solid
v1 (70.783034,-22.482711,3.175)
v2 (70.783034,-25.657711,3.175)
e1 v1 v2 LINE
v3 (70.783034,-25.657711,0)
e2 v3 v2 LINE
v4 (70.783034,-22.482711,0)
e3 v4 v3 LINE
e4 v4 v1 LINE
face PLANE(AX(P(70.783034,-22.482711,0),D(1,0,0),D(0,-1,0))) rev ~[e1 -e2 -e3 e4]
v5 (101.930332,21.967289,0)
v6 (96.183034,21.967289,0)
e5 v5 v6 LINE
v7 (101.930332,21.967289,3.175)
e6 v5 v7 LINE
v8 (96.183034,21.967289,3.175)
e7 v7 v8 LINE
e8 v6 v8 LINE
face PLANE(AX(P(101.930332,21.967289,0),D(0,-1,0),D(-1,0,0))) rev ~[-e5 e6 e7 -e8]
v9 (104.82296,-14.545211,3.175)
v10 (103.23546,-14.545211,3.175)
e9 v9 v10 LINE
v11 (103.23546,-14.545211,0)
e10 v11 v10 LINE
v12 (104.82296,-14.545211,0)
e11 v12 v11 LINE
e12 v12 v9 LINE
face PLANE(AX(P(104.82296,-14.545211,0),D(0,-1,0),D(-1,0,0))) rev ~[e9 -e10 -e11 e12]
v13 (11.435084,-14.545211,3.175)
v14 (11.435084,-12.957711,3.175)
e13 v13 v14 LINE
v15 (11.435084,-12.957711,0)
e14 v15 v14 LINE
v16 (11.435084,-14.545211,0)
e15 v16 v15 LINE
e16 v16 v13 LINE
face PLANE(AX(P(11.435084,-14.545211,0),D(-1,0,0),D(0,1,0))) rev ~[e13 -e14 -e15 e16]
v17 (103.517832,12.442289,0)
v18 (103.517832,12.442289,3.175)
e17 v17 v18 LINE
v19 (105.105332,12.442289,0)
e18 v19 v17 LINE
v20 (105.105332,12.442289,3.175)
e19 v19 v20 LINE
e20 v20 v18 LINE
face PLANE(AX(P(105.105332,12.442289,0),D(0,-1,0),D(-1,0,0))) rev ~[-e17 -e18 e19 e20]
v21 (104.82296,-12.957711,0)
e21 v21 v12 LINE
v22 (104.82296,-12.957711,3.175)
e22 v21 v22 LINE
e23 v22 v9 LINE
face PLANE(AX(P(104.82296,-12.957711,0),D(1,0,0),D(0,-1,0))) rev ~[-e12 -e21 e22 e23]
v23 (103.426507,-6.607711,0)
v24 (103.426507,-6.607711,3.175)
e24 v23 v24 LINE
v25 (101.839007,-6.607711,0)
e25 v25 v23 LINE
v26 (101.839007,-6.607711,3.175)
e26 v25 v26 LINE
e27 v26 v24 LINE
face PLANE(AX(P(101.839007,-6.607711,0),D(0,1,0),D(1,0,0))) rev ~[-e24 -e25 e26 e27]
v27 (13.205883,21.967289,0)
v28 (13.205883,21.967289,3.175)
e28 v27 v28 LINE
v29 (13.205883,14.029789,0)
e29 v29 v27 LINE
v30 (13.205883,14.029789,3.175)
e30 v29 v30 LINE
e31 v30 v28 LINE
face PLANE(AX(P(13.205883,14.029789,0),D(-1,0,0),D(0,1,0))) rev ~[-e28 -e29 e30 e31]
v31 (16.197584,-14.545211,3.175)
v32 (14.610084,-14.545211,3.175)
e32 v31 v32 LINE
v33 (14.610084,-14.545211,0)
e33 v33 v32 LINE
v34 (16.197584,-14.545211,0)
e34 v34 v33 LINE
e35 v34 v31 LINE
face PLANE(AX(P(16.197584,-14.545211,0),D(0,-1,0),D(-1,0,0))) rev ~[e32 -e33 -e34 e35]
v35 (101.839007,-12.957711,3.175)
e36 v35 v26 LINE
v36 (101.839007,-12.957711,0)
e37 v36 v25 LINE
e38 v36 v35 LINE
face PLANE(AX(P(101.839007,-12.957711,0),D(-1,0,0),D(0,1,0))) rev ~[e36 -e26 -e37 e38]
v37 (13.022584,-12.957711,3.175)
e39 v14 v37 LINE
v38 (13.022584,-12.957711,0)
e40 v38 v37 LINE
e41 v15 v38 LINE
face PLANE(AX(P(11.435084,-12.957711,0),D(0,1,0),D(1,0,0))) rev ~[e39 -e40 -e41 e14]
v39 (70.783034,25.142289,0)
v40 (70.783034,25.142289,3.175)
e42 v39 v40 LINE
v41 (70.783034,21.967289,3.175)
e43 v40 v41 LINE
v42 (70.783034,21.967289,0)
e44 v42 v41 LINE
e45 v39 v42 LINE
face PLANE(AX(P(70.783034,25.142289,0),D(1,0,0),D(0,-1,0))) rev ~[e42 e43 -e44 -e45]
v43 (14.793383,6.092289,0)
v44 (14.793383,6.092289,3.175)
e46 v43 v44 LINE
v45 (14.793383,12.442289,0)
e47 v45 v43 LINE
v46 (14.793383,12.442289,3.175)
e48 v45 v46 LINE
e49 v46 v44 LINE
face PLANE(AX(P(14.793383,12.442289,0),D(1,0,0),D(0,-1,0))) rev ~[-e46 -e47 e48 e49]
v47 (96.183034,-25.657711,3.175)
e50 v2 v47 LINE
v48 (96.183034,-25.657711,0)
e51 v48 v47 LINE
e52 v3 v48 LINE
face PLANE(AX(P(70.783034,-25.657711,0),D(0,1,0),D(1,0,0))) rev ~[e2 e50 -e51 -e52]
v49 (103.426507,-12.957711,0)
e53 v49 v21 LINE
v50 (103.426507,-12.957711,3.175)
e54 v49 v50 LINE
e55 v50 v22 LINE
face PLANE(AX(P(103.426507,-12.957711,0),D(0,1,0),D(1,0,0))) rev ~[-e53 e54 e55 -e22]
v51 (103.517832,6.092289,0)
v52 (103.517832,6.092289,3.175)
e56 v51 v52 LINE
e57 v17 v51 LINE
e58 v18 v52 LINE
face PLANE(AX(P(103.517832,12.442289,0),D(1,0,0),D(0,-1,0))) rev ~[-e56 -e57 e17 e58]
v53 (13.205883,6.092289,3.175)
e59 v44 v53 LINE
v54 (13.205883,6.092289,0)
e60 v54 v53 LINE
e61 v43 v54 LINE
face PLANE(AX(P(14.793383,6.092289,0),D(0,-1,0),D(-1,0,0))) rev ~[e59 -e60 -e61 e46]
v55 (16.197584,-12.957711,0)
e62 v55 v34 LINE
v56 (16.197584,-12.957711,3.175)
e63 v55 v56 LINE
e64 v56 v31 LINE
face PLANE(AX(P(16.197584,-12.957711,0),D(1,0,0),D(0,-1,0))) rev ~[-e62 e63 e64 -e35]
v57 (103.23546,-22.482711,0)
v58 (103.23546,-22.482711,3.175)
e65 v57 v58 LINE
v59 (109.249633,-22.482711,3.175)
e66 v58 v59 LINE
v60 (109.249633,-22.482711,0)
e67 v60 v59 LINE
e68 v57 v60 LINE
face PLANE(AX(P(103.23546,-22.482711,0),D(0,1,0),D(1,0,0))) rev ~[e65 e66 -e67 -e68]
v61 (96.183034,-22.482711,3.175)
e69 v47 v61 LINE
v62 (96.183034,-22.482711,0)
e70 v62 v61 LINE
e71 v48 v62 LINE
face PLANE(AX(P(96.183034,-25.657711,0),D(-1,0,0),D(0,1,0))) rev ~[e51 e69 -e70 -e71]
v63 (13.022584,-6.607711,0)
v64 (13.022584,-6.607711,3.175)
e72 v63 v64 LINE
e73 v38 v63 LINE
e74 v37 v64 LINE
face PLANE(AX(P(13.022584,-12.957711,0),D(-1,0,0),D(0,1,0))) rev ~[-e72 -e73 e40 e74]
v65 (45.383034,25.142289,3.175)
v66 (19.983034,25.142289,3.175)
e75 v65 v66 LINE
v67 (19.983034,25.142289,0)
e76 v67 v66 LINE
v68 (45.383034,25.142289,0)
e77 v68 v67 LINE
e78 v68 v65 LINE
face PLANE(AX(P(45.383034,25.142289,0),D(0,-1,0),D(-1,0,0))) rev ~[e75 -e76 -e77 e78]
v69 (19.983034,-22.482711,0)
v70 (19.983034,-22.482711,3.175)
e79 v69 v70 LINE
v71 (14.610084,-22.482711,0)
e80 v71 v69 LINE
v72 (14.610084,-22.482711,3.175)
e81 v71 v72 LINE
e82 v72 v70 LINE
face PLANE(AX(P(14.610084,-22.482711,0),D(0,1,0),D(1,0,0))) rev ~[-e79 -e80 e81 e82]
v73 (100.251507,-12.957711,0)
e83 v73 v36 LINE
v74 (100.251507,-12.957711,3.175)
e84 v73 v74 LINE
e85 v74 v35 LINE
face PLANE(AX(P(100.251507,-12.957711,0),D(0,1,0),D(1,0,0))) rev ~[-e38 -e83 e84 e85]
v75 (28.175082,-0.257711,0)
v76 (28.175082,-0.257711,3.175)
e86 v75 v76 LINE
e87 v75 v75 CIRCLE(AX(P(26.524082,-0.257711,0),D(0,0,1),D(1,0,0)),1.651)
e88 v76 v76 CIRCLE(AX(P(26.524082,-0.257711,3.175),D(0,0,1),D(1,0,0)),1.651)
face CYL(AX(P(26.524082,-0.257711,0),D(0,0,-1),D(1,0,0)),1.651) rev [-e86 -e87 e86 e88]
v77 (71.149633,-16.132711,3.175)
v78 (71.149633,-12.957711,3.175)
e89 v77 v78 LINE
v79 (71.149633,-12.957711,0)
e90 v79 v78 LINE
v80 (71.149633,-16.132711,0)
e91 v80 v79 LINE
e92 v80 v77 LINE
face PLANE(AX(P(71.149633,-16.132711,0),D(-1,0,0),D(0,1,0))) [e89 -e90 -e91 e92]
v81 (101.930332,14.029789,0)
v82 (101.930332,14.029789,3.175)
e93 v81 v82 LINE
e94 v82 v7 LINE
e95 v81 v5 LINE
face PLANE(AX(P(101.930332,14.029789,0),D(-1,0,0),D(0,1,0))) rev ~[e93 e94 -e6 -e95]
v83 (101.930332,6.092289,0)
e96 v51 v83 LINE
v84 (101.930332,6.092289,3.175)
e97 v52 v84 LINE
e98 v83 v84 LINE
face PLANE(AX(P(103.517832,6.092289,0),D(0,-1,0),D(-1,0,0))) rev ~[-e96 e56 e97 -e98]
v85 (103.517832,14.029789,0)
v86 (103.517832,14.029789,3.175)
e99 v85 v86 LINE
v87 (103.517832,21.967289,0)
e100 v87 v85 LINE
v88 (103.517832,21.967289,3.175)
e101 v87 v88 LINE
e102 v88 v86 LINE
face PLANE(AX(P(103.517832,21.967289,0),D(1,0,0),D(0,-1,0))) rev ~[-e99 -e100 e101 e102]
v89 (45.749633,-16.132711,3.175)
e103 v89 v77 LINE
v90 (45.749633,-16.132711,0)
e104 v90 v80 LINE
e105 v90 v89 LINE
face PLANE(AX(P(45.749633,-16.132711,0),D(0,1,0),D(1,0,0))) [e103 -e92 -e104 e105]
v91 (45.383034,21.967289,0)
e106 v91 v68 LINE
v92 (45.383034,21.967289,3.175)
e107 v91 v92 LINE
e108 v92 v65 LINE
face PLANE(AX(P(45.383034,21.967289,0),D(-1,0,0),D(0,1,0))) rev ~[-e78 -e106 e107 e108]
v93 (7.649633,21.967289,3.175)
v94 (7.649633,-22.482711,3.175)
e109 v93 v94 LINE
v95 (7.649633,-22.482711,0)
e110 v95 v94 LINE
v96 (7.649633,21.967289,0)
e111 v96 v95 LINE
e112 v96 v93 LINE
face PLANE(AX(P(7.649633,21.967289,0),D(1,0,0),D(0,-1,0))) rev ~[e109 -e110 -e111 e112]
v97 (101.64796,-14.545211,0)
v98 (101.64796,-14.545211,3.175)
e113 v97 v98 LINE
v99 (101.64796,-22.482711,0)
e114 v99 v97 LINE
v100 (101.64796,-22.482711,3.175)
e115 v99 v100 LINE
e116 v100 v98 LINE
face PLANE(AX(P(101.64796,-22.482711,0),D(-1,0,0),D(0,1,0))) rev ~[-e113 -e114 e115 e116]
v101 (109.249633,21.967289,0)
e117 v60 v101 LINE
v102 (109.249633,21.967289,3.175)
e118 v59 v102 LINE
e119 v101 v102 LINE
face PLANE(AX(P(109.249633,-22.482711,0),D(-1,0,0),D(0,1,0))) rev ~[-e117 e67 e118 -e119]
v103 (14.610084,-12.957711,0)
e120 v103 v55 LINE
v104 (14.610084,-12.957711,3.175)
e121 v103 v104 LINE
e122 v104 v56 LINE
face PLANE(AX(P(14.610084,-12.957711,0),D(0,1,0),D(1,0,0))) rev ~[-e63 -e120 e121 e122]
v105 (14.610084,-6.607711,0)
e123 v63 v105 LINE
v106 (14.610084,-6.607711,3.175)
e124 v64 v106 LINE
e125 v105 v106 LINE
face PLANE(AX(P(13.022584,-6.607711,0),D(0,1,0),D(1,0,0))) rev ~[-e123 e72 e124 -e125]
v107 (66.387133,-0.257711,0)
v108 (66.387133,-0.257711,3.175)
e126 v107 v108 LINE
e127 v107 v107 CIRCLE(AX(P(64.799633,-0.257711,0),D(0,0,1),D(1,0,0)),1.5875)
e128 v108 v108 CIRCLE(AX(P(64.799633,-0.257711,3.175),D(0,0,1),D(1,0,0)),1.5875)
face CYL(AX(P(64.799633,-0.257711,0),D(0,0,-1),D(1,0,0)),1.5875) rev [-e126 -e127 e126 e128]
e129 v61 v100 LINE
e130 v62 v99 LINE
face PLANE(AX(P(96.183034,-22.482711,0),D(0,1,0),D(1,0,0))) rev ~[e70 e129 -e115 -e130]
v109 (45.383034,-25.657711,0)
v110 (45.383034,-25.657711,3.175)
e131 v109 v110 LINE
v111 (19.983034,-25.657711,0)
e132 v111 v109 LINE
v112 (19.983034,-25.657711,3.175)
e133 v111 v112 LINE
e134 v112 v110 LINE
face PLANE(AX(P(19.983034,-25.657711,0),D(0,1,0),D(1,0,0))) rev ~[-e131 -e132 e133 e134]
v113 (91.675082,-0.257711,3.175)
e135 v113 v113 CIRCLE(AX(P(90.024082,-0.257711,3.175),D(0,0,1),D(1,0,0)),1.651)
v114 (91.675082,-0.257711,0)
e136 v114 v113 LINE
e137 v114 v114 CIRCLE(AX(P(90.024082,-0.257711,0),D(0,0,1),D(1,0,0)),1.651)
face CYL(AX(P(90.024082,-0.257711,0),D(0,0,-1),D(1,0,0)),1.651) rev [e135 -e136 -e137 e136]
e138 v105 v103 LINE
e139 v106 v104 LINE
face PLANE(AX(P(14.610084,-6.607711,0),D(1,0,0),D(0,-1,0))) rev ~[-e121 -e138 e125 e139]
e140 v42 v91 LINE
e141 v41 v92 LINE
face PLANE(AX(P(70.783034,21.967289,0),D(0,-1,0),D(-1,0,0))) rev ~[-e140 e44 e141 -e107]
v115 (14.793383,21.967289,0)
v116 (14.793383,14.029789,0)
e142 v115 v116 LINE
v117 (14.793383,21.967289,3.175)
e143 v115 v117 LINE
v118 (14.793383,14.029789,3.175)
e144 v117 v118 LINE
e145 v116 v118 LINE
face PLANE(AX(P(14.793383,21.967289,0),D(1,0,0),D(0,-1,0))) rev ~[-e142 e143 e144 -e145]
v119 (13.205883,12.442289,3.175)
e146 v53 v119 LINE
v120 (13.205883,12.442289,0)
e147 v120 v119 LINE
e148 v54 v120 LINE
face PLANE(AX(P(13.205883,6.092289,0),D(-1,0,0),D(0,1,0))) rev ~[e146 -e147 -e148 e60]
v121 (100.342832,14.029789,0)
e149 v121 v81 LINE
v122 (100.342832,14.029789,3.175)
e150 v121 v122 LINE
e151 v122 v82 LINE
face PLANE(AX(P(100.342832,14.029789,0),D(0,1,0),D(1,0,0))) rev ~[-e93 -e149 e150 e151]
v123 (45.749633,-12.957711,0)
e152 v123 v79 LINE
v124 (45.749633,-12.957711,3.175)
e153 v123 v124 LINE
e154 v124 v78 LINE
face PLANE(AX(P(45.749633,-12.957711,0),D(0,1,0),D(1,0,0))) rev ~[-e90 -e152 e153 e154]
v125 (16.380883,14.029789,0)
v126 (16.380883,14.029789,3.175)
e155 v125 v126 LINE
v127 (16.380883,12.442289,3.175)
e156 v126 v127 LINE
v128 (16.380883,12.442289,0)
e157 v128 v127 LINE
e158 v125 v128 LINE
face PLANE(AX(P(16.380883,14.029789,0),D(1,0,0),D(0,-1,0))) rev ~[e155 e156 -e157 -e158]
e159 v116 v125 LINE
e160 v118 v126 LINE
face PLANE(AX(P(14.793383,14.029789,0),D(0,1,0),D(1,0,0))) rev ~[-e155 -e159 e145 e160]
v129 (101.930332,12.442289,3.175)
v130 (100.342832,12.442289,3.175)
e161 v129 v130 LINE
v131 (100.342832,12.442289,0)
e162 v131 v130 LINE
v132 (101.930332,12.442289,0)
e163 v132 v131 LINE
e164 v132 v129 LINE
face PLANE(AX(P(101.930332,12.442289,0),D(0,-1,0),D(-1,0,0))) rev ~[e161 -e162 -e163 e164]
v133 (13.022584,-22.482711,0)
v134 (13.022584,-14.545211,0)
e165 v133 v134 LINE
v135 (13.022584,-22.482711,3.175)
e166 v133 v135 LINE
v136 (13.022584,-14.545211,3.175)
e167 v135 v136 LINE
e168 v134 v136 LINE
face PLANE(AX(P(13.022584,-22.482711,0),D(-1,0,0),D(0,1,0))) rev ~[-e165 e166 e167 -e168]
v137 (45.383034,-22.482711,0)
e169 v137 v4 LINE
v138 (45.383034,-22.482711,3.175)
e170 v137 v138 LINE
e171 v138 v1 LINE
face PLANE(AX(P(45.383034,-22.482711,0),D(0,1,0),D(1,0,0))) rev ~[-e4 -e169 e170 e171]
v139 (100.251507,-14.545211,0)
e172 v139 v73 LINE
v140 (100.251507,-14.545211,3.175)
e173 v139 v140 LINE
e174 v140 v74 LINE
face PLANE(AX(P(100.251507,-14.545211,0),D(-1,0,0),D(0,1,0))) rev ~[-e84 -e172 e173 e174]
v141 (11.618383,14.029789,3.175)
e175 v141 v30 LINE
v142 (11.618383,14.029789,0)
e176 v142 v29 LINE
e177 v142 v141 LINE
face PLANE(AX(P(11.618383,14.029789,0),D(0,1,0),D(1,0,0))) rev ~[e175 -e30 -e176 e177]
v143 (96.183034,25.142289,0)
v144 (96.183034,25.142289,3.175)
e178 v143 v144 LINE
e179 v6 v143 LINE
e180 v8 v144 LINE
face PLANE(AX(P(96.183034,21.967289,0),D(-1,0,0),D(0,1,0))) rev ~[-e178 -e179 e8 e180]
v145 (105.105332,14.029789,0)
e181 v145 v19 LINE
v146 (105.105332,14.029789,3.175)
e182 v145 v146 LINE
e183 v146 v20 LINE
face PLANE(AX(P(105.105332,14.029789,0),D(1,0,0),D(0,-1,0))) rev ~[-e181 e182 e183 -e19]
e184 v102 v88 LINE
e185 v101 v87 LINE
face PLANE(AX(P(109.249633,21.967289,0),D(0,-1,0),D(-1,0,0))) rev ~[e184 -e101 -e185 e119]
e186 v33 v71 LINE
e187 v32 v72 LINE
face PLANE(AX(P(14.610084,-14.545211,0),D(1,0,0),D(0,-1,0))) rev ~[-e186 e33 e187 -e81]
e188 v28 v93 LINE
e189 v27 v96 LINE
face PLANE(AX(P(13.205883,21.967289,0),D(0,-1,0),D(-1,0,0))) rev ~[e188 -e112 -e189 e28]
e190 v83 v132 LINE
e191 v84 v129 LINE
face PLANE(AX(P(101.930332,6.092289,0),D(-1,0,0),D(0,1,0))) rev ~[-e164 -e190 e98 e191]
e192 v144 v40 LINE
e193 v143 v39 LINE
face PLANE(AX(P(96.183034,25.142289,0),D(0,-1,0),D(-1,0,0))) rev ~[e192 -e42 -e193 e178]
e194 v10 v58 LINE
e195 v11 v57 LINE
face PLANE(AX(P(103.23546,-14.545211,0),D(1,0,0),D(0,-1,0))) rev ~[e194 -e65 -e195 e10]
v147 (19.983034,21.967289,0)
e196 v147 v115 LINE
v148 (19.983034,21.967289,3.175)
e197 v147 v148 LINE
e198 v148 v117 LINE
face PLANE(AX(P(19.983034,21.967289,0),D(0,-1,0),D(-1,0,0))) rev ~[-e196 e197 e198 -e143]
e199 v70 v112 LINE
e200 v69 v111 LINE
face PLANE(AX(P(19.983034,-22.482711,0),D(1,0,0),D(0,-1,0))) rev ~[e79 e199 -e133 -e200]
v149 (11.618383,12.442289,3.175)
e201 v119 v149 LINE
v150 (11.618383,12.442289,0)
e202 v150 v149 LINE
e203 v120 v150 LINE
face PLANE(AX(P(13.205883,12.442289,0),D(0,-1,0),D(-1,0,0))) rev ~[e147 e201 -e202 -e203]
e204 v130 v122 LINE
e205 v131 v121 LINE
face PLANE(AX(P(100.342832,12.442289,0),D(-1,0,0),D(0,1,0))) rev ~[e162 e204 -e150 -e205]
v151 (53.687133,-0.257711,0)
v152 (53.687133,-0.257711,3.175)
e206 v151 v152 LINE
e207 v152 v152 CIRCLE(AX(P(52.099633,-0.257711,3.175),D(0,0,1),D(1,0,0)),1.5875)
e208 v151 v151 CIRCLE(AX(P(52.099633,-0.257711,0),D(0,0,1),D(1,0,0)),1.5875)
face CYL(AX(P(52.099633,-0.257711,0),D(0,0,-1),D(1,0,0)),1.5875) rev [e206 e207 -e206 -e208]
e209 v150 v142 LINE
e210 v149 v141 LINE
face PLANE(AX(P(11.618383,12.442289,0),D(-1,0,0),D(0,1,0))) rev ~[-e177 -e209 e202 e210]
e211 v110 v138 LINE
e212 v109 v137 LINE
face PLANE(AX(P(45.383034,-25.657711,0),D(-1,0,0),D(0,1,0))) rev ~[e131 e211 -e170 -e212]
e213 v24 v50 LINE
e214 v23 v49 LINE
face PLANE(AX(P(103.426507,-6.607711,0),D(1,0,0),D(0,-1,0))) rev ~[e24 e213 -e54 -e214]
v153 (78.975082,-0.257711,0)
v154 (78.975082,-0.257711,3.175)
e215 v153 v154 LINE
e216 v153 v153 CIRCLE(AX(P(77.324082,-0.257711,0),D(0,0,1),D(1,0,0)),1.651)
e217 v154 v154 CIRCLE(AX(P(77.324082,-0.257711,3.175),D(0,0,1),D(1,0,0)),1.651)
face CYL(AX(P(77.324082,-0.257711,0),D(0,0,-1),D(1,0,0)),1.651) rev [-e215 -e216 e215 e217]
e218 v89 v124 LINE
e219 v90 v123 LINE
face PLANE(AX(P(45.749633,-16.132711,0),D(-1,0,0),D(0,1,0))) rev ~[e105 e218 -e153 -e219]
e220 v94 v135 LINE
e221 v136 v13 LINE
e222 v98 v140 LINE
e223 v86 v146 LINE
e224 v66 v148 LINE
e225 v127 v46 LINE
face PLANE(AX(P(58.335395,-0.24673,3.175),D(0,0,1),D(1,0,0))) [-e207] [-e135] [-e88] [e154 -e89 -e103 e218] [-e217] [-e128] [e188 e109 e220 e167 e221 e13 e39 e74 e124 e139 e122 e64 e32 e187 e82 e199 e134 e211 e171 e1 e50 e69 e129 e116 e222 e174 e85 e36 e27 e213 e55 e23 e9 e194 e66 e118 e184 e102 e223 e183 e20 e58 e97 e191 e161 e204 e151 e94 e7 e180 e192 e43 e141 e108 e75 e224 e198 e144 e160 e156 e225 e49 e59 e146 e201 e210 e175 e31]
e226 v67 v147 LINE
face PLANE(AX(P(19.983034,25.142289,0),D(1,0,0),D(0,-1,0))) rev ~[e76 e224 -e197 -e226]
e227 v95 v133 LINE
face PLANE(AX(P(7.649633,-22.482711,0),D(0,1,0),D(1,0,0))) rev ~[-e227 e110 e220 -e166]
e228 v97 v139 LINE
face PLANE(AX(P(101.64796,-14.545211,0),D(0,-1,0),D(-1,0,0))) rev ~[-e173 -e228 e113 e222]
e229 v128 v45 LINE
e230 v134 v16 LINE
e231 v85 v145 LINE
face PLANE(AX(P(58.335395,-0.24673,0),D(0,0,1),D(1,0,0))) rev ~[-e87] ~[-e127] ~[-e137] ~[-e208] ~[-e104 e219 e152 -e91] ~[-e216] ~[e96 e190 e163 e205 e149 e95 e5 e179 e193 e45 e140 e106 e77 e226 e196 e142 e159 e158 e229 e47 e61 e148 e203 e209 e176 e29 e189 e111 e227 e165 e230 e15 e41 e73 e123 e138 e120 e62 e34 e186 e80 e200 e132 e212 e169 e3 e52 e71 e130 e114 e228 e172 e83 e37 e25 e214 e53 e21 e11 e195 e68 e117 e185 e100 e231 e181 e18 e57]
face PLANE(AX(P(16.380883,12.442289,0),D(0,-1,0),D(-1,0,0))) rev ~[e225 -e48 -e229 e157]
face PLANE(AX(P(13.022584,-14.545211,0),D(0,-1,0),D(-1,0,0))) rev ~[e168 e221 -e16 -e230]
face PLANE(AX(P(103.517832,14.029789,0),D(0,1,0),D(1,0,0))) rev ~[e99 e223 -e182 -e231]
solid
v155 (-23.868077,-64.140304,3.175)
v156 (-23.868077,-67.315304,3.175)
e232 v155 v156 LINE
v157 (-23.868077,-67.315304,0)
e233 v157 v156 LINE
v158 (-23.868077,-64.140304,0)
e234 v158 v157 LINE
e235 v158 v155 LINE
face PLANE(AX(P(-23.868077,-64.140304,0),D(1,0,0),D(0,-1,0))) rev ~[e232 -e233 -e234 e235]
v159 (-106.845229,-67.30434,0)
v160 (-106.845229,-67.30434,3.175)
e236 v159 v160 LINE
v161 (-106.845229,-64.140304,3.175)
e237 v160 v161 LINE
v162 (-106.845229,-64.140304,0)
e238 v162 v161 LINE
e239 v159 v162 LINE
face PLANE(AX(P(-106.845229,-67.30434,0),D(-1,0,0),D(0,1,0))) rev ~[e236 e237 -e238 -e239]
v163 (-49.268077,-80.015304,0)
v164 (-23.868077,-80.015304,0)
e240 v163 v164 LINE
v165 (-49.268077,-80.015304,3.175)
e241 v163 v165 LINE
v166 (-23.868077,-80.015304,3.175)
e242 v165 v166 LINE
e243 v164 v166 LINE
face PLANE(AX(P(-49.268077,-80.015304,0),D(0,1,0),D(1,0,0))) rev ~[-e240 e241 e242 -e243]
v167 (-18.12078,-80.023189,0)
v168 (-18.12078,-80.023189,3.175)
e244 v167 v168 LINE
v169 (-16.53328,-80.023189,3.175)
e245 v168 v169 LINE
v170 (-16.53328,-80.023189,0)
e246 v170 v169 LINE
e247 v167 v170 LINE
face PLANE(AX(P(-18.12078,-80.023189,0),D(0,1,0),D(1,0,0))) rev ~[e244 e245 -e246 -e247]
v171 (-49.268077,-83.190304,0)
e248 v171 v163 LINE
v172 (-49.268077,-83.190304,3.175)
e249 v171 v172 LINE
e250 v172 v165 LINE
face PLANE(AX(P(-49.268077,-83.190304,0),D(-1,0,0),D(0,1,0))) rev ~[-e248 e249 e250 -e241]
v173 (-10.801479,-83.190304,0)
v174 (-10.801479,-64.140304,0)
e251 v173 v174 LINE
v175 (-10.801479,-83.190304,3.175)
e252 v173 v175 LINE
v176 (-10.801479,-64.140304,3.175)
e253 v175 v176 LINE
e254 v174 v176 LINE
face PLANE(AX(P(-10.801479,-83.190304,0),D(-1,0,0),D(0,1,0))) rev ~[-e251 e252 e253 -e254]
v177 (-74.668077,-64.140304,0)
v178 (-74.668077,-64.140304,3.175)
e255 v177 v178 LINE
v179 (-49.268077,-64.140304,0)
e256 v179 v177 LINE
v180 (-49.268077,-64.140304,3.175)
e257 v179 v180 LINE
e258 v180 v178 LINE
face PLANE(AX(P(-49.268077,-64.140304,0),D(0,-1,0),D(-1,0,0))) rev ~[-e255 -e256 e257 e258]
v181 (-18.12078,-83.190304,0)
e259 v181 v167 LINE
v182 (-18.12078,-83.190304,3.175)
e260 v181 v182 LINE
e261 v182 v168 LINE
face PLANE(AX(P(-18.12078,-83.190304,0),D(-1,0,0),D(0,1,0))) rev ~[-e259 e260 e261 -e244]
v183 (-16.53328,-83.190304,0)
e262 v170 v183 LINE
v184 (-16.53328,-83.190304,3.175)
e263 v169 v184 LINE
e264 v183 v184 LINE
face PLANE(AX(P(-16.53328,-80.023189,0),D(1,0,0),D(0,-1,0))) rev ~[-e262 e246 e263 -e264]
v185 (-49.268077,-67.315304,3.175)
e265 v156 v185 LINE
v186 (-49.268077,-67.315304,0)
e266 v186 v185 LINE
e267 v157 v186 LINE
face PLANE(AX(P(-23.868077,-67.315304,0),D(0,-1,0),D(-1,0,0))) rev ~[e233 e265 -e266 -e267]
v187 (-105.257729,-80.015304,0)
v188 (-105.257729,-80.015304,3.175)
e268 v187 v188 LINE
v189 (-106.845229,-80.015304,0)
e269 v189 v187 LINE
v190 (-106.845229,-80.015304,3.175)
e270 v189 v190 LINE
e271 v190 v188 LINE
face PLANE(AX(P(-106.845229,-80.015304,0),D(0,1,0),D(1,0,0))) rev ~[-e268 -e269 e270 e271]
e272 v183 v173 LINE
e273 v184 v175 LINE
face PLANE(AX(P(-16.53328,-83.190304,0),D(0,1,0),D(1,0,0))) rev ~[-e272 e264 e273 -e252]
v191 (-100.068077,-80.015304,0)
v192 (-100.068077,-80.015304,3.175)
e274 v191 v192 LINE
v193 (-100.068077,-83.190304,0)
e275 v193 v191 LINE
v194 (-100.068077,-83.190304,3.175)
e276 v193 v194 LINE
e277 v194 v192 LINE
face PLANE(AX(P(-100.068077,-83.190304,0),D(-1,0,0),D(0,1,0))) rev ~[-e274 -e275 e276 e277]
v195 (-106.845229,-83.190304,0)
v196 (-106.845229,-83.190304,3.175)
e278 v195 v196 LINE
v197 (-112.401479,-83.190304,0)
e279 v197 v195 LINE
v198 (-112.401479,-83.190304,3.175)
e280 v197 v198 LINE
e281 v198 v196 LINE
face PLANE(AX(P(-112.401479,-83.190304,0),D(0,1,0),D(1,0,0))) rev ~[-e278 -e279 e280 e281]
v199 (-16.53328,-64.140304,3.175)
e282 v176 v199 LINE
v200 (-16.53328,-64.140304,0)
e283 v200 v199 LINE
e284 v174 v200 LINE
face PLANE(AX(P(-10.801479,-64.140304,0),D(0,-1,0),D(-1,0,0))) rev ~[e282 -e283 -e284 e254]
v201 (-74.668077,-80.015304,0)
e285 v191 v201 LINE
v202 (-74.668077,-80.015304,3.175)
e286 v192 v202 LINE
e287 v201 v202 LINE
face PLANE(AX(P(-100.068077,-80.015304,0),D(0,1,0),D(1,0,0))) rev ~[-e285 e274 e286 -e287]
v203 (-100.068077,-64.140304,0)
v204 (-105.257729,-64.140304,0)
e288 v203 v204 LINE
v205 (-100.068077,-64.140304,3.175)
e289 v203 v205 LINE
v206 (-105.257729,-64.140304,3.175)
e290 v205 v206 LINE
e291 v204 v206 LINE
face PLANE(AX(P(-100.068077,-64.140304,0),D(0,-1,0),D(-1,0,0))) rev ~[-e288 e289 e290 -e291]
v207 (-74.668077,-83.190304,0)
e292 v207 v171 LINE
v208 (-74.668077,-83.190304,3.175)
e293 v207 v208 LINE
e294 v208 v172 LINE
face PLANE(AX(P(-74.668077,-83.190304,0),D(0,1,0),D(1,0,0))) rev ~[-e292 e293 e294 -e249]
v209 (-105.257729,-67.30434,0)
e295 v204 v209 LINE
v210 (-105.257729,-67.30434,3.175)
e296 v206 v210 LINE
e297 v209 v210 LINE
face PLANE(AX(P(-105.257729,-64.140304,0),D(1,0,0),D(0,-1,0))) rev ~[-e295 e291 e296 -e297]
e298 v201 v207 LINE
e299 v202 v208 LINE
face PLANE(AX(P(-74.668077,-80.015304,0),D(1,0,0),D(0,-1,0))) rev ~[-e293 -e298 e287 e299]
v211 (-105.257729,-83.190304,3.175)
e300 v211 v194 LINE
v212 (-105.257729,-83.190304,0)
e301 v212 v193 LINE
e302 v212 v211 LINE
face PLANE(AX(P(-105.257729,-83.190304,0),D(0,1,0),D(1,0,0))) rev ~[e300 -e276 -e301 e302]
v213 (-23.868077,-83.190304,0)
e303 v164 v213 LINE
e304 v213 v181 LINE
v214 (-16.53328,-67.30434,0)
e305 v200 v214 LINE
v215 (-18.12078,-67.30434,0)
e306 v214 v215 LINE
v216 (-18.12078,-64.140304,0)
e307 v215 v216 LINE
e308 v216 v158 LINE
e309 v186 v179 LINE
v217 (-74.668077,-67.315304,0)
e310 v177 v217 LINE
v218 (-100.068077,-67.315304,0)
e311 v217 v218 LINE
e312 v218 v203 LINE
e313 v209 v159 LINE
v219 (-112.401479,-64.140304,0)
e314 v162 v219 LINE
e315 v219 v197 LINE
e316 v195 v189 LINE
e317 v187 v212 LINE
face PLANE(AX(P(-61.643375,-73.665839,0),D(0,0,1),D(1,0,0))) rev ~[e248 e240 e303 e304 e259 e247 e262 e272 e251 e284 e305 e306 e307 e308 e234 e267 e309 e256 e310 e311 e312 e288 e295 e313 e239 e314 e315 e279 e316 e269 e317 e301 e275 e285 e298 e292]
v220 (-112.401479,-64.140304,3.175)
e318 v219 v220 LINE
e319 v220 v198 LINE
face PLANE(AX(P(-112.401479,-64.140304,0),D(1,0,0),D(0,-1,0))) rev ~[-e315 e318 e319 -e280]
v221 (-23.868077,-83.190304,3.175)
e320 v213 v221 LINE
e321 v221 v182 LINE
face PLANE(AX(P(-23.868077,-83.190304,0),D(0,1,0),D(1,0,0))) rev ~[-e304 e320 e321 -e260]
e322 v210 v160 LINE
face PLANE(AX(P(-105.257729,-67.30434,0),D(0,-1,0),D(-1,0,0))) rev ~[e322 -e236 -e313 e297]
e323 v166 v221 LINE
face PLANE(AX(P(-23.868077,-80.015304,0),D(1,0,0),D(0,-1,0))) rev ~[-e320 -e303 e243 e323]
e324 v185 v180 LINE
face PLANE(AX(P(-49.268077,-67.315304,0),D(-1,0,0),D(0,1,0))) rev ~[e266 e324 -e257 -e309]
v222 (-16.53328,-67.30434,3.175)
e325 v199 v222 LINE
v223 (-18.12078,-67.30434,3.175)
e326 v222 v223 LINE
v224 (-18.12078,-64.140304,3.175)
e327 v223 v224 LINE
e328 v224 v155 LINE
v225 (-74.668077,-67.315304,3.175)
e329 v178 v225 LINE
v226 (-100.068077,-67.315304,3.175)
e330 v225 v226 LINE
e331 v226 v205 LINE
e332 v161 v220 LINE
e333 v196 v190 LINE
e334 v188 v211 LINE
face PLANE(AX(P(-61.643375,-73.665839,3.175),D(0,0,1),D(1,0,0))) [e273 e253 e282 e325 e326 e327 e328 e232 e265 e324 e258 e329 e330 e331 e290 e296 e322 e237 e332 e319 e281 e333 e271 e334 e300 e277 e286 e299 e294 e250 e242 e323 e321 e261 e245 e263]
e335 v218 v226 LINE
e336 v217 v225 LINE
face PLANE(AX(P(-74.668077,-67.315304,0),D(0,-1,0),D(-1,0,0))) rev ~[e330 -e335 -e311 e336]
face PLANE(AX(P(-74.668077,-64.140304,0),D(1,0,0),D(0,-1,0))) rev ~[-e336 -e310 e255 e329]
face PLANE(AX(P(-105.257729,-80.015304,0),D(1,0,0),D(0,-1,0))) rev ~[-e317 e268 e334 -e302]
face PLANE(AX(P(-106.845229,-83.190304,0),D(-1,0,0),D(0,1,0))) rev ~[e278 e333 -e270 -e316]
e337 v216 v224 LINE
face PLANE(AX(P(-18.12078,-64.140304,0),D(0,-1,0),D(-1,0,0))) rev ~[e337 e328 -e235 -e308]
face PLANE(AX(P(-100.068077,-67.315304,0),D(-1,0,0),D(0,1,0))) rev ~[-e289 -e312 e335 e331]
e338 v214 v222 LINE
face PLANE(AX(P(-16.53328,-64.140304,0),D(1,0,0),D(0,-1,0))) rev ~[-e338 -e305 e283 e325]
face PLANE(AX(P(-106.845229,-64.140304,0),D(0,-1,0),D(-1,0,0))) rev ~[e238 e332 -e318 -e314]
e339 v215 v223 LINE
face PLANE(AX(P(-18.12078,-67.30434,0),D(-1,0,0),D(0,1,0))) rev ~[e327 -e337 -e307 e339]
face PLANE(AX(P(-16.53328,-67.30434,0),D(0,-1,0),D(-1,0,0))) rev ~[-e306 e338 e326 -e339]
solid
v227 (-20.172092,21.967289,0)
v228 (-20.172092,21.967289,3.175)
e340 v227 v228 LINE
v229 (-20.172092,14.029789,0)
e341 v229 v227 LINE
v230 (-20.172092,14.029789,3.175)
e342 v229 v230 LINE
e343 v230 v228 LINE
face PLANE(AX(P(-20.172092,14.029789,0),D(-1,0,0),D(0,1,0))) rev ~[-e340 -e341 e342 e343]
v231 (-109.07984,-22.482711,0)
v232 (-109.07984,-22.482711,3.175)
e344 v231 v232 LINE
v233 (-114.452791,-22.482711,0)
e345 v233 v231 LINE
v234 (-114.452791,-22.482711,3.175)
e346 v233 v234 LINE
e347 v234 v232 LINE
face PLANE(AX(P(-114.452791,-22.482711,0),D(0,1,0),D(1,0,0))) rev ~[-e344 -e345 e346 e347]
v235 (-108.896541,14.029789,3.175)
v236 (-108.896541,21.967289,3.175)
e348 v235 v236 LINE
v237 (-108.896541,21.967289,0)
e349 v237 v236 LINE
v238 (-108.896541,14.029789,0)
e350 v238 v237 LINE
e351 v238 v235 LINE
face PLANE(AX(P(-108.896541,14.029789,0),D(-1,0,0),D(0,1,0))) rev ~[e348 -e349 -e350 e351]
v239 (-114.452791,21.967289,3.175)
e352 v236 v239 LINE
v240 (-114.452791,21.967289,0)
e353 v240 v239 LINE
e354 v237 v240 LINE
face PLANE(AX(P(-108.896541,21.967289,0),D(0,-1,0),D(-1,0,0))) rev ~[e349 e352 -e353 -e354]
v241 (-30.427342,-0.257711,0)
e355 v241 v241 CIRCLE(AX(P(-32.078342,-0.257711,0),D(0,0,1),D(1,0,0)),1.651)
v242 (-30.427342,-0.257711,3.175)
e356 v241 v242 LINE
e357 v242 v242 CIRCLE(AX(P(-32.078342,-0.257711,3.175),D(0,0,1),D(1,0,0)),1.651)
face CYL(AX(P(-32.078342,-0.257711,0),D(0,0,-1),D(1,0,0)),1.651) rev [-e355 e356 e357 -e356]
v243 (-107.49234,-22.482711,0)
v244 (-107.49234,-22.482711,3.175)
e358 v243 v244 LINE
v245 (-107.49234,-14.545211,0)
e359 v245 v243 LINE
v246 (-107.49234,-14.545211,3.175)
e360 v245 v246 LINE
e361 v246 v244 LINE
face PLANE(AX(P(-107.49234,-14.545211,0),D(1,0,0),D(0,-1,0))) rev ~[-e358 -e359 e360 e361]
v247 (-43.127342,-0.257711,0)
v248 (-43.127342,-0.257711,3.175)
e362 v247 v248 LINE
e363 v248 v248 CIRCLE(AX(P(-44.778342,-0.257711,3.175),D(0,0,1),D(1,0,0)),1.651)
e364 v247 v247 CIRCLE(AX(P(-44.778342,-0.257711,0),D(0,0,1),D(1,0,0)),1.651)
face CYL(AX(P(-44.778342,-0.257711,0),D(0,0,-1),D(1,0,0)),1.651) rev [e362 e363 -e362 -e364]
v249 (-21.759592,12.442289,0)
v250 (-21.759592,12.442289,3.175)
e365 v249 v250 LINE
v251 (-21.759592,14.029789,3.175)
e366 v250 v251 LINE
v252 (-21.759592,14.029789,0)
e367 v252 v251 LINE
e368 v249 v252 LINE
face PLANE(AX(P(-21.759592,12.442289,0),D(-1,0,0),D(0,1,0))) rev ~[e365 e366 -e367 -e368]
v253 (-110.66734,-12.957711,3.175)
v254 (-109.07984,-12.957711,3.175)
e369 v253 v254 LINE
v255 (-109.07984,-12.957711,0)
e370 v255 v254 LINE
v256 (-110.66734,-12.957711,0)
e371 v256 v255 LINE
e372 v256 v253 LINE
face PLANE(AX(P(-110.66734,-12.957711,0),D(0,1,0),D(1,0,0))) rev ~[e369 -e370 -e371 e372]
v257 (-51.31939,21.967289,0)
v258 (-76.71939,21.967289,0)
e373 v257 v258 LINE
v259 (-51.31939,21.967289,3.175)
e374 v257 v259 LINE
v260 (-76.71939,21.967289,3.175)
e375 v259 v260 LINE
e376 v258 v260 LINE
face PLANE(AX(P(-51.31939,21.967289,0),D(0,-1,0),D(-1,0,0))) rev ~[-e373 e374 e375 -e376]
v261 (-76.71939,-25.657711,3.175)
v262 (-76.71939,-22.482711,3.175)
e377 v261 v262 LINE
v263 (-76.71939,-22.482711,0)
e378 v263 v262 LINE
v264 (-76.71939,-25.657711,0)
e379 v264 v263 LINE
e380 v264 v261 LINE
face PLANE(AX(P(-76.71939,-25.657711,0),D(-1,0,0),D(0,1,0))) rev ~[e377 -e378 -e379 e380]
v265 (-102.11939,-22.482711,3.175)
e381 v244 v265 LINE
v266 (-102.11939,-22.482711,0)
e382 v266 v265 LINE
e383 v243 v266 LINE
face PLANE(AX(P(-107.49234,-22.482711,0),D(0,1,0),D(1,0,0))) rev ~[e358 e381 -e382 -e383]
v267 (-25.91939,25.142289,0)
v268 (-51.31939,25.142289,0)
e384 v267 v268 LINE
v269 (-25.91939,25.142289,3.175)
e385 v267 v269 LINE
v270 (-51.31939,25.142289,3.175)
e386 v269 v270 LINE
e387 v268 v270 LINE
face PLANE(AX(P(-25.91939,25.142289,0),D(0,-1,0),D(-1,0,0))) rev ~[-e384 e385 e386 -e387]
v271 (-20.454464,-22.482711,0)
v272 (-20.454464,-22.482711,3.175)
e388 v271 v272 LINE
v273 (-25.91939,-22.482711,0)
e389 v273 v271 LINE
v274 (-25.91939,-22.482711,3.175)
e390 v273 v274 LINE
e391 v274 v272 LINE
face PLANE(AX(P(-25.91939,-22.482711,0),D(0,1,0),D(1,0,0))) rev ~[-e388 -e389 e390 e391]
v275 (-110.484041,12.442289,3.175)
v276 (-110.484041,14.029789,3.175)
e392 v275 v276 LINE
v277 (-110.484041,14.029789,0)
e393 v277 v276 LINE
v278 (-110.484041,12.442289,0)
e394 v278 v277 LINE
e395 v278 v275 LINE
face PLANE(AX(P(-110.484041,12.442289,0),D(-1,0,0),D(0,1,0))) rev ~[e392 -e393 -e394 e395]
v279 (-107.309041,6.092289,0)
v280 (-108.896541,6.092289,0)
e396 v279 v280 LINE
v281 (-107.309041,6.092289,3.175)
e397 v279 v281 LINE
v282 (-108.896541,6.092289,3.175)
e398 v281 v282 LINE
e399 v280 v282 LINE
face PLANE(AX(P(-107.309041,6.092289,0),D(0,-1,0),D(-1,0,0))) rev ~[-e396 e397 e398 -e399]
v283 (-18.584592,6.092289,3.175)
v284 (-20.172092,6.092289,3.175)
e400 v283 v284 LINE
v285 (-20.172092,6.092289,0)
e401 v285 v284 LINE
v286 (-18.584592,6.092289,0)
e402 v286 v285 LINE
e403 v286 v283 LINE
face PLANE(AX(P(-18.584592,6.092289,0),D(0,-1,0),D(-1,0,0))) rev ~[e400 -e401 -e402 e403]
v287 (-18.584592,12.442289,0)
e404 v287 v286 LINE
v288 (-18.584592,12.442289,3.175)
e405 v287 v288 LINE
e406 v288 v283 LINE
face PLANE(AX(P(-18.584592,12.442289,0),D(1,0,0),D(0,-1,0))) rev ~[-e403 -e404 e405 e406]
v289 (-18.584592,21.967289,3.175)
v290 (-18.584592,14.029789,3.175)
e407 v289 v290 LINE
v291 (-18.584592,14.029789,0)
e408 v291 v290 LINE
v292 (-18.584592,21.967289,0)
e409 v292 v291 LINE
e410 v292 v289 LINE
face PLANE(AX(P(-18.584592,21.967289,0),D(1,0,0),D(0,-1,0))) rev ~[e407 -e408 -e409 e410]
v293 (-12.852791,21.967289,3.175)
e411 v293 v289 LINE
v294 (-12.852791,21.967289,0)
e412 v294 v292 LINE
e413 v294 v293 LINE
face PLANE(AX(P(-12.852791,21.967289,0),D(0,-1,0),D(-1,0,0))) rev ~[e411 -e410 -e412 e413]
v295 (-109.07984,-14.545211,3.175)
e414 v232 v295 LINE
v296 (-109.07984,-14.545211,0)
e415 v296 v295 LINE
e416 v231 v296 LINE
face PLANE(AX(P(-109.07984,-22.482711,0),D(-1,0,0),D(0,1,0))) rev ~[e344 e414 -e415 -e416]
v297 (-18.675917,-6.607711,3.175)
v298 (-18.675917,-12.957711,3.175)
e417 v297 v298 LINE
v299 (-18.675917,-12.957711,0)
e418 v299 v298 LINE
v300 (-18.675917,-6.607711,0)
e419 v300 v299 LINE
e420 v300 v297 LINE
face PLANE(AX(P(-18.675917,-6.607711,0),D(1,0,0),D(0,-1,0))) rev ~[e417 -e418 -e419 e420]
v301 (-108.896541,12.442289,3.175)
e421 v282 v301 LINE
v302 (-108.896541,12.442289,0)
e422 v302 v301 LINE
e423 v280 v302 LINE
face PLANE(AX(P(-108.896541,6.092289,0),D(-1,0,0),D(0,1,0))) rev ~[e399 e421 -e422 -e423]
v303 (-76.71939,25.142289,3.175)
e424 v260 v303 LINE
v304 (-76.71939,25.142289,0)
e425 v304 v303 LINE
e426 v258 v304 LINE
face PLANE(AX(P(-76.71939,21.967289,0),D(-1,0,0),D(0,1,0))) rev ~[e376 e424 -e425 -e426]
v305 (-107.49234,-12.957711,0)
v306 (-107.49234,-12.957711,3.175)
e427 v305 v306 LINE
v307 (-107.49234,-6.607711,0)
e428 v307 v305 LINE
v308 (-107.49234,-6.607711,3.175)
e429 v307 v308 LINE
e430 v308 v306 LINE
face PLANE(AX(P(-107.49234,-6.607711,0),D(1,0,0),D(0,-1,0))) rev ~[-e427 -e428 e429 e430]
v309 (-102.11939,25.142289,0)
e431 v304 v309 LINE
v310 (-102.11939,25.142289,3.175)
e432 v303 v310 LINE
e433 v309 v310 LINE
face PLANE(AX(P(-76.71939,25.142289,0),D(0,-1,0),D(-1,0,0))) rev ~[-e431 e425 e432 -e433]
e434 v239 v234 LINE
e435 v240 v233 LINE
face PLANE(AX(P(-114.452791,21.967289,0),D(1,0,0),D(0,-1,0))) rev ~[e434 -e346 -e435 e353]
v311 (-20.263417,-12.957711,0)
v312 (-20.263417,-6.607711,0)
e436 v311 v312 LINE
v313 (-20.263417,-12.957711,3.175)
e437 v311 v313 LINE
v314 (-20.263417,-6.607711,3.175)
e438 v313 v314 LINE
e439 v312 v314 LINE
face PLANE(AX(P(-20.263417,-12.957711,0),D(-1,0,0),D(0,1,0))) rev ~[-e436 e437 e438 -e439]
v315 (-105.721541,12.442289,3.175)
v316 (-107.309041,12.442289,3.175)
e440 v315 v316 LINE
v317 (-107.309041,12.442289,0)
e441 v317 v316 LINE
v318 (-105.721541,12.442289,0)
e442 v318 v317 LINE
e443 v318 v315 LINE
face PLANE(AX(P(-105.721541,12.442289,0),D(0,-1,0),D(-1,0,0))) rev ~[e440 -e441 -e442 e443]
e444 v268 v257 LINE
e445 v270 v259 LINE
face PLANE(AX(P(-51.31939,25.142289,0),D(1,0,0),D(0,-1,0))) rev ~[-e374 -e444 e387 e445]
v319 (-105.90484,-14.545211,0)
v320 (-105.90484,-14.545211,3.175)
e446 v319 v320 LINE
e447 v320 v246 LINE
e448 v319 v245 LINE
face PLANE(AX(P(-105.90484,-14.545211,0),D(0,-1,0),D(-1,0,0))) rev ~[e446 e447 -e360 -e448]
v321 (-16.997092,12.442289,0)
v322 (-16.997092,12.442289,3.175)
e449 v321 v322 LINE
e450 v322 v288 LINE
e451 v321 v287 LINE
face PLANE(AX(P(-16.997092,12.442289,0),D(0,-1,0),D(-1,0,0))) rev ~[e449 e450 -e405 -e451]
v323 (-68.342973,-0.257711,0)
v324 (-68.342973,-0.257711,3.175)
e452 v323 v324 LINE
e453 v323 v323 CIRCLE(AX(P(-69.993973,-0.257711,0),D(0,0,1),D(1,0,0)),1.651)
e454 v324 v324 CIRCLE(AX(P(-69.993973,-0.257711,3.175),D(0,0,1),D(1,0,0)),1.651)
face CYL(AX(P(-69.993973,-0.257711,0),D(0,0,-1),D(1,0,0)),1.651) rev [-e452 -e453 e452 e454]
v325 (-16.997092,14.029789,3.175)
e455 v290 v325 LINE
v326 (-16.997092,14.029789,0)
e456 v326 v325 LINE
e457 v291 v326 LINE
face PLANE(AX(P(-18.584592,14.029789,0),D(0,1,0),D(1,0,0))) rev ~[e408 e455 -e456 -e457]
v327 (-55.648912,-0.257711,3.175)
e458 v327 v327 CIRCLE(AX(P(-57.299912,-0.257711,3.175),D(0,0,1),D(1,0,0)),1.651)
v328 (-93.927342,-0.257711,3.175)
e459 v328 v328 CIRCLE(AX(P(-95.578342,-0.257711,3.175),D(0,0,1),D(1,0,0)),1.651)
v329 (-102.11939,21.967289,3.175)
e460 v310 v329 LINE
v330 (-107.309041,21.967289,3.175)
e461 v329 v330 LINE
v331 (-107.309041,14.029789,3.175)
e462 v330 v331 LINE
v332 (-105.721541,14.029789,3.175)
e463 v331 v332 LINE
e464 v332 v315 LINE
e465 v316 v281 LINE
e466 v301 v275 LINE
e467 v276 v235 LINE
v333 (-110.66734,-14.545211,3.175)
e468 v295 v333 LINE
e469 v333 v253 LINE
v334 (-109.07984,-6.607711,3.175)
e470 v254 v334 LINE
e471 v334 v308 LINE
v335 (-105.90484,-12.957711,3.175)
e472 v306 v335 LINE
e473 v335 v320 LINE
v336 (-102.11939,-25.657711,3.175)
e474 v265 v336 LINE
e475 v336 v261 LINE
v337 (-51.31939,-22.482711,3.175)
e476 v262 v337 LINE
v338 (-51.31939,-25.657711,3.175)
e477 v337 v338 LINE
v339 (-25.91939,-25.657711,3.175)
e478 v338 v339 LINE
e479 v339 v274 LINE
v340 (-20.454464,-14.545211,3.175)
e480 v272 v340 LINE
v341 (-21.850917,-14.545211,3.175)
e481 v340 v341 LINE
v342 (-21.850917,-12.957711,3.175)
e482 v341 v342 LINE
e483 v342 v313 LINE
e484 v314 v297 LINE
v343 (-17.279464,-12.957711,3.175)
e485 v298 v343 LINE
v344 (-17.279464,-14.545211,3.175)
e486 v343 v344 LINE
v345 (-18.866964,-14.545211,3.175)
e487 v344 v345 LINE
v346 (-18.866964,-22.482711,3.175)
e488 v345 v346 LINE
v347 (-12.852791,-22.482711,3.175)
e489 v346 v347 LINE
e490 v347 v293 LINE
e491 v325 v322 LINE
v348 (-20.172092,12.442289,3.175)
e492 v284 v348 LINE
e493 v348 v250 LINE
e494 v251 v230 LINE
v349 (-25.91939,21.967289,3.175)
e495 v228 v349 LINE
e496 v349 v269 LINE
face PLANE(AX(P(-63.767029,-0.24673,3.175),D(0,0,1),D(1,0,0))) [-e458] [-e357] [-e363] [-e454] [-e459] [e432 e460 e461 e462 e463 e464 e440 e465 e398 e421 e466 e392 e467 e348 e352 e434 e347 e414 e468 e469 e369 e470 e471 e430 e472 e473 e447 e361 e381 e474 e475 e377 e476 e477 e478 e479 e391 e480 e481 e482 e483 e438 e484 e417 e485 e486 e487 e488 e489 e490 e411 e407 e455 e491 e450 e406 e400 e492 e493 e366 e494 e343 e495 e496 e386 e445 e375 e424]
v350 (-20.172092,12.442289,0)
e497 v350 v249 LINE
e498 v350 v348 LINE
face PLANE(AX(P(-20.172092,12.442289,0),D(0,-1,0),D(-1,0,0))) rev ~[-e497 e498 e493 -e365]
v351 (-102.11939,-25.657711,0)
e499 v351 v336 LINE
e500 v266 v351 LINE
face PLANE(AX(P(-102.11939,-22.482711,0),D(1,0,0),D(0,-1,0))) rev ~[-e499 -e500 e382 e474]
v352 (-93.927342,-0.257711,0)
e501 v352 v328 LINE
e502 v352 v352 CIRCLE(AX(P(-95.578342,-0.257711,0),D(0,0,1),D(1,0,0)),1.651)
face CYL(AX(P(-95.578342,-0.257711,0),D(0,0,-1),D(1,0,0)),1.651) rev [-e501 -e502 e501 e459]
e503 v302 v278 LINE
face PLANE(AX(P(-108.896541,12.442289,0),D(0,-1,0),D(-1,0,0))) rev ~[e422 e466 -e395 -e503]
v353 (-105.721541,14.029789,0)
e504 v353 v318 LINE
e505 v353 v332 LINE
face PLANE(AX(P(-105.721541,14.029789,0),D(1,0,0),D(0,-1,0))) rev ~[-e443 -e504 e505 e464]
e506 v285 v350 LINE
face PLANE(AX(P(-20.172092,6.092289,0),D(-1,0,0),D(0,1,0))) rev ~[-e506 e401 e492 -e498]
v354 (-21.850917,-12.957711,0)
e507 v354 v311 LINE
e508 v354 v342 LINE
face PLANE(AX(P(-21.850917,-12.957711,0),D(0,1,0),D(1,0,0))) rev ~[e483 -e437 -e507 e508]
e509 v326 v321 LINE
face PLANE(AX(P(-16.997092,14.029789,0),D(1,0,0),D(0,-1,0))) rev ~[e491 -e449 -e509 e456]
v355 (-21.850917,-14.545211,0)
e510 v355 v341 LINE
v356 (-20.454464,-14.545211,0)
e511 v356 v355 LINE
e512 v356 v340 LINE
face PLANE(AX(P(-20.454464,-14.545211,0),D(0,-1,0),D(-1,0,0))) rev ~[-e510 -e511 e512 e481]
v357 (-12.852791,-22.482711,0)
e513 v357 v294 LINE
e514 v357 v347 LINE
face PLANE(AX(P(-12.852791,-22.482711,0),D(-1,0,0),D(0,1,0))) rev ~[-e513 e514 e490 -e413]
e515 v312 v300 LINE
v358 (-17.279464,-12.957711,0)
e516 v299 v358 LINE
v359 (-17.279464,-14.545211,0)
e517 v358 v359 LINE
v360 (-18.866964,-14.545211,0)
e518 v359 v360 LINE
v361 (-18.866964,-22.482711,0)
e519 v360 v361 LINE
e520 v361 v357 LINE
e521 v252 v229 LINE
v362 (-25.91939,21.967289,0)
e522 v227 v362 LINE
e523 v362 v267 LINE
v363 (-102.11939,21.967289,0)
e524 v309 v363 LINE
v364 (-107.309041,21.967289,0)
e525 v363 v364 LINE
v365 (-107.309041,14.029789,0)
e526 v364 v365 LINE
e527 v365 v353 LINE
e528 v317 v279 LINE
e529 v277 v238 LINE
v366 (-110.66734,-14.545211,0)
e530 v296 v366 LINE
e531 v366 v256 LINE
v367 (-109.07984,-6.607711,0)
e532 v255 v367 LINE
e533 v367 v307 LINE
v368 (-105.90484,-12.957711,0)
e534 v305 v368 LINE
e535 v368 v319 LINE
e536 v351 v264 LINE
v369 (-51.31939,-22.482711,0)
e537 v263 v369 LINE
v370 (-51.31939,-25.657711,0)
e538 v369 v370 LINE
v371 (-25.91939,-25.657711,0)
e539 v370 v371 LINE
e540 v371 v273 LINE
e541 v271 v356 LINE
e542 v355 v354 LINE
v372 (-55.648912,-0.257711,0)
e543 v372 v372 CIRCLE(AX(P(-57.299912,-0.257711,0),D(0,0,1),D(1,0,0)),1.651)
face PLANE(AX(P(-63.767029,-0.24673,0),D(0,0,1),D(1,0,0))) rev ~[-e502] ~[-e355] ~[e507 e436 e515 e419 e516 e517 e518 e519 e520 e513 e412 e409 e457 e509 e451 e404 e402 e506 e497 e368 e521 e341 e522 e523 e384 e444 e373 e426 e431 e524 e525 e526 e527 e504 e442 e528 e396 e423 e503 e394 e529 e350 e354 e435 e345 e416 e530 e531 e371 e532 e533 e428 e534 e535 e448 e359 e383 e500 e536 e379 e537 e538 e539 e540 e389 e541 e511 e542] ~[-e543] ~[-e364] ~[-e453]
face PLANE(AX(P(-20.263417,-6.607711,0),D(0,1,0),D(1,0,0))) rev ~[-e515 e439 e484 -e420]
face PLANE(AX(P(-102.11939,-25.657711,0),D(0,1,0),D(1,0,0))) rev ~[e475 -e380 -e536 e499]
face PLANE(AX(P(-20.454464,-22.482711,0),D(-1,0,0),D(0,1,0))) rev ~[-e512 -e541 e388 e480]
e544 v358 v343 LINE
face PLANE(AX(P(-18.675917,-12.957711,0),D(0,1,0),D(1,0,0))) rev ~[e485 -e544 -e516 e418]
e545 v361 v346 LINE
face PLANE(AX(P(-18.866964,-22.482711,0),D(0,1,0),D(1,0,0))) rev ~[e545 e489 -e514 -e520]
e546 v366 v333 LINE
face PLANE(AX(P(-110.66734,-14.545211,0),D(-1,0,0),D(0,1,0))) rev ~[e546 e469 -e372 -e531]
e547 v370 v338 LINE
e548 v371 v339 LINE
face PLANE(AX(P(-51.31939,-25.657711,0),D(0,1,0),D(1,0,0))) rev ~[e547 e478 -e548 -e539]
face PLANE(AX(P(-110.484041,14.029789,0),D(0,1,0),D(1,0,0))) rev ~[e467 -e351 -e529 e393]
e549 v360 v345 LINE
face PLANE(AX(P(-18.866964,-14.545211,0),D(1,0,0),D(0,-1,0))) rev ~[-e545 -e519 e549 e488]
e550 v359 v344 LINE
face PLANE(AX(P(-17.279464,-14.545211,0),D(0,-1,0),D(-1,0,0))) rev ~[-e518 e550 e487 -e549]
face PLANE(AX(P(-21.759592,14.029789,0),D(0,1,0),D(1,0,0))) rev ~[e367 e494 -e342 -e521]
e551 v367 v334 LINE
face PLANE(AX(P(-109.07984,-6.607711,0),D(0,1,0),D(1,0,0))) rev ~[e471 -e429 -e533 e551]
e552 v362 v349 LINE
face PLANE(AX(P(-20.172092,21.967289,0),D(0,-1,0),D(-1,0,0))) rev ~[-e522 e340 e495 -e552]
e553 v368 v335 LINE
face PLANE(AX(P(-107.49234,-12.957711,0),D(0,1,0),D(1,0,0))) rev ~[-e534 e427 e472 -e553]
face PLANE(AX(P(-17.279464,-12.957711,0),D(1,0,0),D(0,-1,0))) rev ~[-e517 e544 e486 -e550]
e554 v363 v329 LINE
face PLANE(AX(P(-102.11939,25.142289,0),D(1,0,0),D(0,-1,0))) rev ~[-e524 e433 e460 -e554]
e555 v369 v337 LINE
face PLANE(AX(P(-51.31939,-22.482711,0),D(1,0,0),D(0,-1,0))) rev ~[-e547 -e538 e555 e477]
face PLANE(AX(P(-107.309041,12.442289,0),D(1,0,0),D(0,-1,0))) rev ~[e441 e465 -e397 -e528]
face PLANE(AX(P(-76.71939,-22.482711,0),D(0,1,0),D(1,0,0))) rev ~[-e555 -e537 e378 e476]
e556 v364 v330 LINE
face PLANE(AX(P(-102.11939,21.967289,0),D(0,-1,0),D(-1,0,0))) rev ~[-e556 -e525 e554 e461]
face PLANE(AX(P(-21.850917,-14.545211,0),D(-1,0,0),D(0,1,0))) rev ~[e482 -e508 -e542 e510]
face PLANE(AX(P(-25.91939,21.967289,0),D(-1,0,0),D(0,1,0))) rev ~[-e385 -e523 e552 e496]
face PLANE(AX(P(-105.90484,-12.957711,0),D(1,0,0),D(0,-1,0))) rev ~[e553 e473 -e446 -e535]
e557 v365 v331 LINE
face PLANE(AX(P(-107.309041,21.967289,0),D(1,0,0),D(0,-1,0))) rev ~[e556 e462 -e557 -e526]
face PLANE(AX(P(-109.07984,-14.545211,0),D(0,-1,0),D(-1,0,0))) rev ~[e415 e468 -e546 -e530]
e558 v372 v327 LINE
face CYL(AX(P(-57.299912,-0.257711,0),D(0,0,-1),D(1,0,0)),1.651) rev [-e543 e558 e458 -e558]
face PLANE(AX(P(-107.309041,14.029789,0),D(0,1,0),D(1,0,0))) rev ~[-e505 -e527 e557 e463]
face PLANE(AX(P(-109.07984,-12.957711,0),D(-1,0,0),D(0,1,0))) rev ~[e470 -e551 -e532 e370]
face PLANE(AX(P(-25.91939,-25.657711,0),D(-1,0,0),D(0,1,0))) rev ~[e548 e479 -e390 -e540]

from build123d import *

# Parameters (mm, degrees)
F0_W     = 25.4
F0_H     = 3.175
F0_R     = 1.651
F0_R_2   = 1.5875
F1_DEPTH = 3.175


# Not quite as in the source:
# - a length typed as a fraction of an inch, garbled in the dataset ("3 / 203.2 mm" for 3/8 in), is restored


with BuildPart() as f1:
    # F0 (on Top) → F1 (new body)
    with BuildSketch(Plane.XY):
        Polygon((14.6100838328, -22.482711039), (19.9830344046, -22.482711039), (19.9830344046, -25.657711039), (45.3830344046, -25.657711039), (45.3830344046, -22.482711039), (70.7830344046, -22.482711039), (70.7830344046, -25.657711039), (96.1830344046, -25.657711039), (96.1830344046, -22.482711039), (101.6479595924, -22.482711039), (101.6479595924, -14.545211039), (100.2515068019, -14.545211039), (100.2515068019, -12.957711039), (101.8390068019, -12.957711039), (101.8390068019, -6.607711039), (103.4265068019, -6.607711039), (103.4265068019, -12.957711039), (104.8229595924, -12.957711039), (104.8229595924, -14.545211039), (103.2354595924, -14.545211039), (103.2354595924, -22.482711039), (109.2496332611, -22.482711039), (109.2496332611, 21.967288961), (103.5178316141, 21.967288961), (103.5178316141, 14.029788961), (105.1053316141, 14.029788961), (105.1053316141, 12.442288961), (103.5178316141, 12.442288961), (103.5178316141, 6.092288961), (101.9303316141, 6.092288961), (101.9303316141, 12.442288961), (100.3428316141, 12.442288961), (100.3428316141, 14.029788961), (101.9303316141, 14.029788961), (101.9303316141, 21.967288961), (96.1830344046, 21.967288961), (96.1830344046, 25.142288961), (70.7830344046, 25.142288961), (70.7830344046, 21.967288961), (45.3830344046, 21.967288961), (45.3830344046, 25.142288961), (19.9830344046, 25.142288961), (19.9830344046, 21.967288961), (14.7933832611, 21.967288961), (14.7933832611, 14.029788961), (16.3808832611, 14.029788961), (16.3808832611, 12.442288961), (14.7933832611, 12.442288961), (14.7933832611, 6.092288961), (13.2058832611, 6.092288961), (13.2058832611, 12.442288961), (11.6183832611, 12.442288961), (11.6183832611, 14.029788961), (13.2058832611, 14.029788961), (13.2058832611, 21.967288961), (7.6496332611, 21.967288961), (7.6496332611, -22.482711039), (13.0225838328, -22.482711039), (13.0225838328, -14.545211039), (11.4350838328, -14.545211039), (11.4350838328, -12.957711039), (13.0225838328, -12.957711039), (13.0225838328, -6.607711039), (13.8163338328, -6.607711039), (14.6100838328, -6.607711039), (14.6100838328, -12.957711039), (16.1975838328, -12.957711039), (16.1975838328, -14.545211039), (14.6100838328, -14.545211039), align=None)
        with Locations((58.4496332611, -14.545211039)):
            Rectangle(F0_W, F0_H, mode=Mode.SUBTRACT)
        with Locations((26.5240816141, -0.257711039)):
            Circle(F0_R, mode=Mode.SUBTRACT)
        with Locations((52.0996332611, -0.257711039)):
            Circle(F0_R_2, mode=Mode.SUBTRACT)
        with Locations((64.7996332611, -0.257711039)):
            Circle(F0_R_2, mode=Mode.SUBTRACT)
        with Locations((77.3240816141, -0.257711039)):
            Circle(F0_R, mode=Mode.SUBTRACT)
        with Locations((90.0240816141, -0.257711039)):
            Circle(F0_R, mode=Mode.SUBTRACT)
    extrude(amount=F1_DEPTH)


with BuildPart() as f1b:
    # F0 (on Top) → F1, piece 2 (new body)
    with BuildSketch(Plane.XY):
        Polygon((-107.4923401093, -22.482711039), (-102.1193895375, -22.482711039), (-102.1193895375, -25.657711039), (-76.7193895375, -25.657711039), (-76.7193895375, -22.482711039), (-51.3193895375, -22.482711039), (-51.3193895375, -25.657711039), (-25.9193895375, -25.657711039), (-25.9193895375, -22.482711039), (-20.4544643497, -22.482711039), (-20.4544643497, -14.545211039), (-21.8509171402, -14.545211039), (-21.8509171402, -12.957711039), (-20.2634171402, -12.957711039), (-20.2634171402, -6.607711039), (-18.6759171402, -6.607711039), (-18.6759171402, -12.957711039), (-17.2794643497, -12.957711039), (-17.2794643497, -14.545211039), (-18.8669643497, -14.545211039), (-18.8669643497, -22.482711039), (-12.852790681, -22.482711039), (-12.852790681, 21.967288961), (-18.584592328, 21.967288961), (-18.584592328, 14.029788961), (-16.997092328, 14.029788961), (-16.997092328, 12.442288961), (-18.584592328, 12.442288961), (-18.584592328, 6.092288961), (-20.172092328, 6.092288961), (-20.172092328, 12.442288961), (-21.759592328, 12.442288961), (-21.759592328, 14.029788961), (-20.172092328, 14.029788961), (-20.172092328, 21.967288961), (-25.9193895375, 21.967288961), (-25.9193895375, 25.142288961), (-51.3193895375, 25.142288961), (-51.3193895375, 21.967288961), (-76.7193895375, 21.967288961), (-76.7193895375, 25.142288961), (-102.1193895375, 25.142288961), (-102.1193895375, 21.967288961), (-107.309040681, 21.967288961), (-107.309040681, 14.029788961), (-105.721540681, 14.029788961), (-105.721540681, 12.442288961), (-107.309040681, 12.442288961), (-107.309040681, 6.092288961), (-108.896540681, 6.092288961), (-108.896540681, 12.442288961), (-110.484040681, 12.442288961), (-110.484040681, 14.029788961), (-108.896540681, 14.029788961), (-108.896540681, 21.967288961), (-114.452790681, 21.967288961), (-114.452790681, -22.482711039), (-109.0798401093, -22.482711039), (-109.0798401093, -14.545211039), (-110.6673401093, -14.545211039), (-110.6673401093, -12.957711039), (-109.0798401093, -12.957711039), (-109.0798401093, -6.607711039), (-108.2860901093, -6.607711039), (-107.4923401093, -6.607711039), (-107.4923401093, -12.957711039), (-105.9048401093, -12.957711039), (-105.9048401093, -14.545211039), (-107.4923401093, -14.545211039), align=None)
        with Locations((-95.578342328, -0.257711039)):
            Circle(F0_R, mode=Mode.SUBTRACT)
        with Locations((-69.9939727783, -0.257711039)):
            Circle(F0_R, mode=Mode.SUBTRACT)
        with Locations((-57.2999119759, -0.257711039)):
            Circle(F0_R, mode=Mode.SUBTRACT)
        with Locations((-44.778342328, -0.257711039)):
            Circle(F0_R, mode=Mode.SUBTRACT)
        with Locations((-32.078342328, -0.257711039)):
            Circle(F0_R, mode=Mode.SUBTRACT)
    extrude(amount=F1_DEPTH)


with BuildPart() as f1c:
    # F0 (on Top) → F1, piece 3 (new body)
    with BuildSketch(Plane.XY):
        Polygon((-100.0680774225, -80.0153038105), (-74.6680774225, -80.0153038105), (-74.6680774225, -83.1903038105), (-49.2680774225, -83.1903038105), (-49.2680774225, -80.0153038105), (-23.8680774225, -80.0153038105), (-23.8680774225, -83.1903038105), (-18.120780213, -83.1903038105), (-18.120780213, -80.0231885267), (-16.533280213, -80.0231885267), (-16.533280213, -83.1903038105), (-10.8014785661, -83.1903038105), (-10.8014785661, -64.1403038105), (-16.533280213, -64.1403038105), (-16.533280213, -67.3043401082), (-18.120780213, -67.3043401082), (-18.120780213, -64.1403038105), (-23.8680774225, -64.1403038105), (-23.8680774225, -67.3153038105), (-49.2680774225, -67.3153038105), (-49.2680774225, -64.1403038105), (-74.6680774225, -64.1403038105), (-74.6680774225, -67.3153038105), (-100.0680774225, -67.3153038105), (-100.0680774225, -64.1403038105), (-105.2577285661, -64.1403038105), (-105.2577285661, -67.3043401082), (-106.8452285661, -67.3043401082), (-106.8452285661, -64.1403038105), (-112.4014785661, -64.1403038105), (-112.4014785661, -83.1903038105), (-106.8452285661, -83.1903038105), (-106.8452285661, -80.0153038105), (-105.2577285661, -80.0153038105), (-105.2577285661, -83.1903038105), (-100.0680774225, -83.1903038105), align=None)
    extrude(amount=F1_DEPTH)


solid = Compound([f1.part, f1b.part, f1c.part])
